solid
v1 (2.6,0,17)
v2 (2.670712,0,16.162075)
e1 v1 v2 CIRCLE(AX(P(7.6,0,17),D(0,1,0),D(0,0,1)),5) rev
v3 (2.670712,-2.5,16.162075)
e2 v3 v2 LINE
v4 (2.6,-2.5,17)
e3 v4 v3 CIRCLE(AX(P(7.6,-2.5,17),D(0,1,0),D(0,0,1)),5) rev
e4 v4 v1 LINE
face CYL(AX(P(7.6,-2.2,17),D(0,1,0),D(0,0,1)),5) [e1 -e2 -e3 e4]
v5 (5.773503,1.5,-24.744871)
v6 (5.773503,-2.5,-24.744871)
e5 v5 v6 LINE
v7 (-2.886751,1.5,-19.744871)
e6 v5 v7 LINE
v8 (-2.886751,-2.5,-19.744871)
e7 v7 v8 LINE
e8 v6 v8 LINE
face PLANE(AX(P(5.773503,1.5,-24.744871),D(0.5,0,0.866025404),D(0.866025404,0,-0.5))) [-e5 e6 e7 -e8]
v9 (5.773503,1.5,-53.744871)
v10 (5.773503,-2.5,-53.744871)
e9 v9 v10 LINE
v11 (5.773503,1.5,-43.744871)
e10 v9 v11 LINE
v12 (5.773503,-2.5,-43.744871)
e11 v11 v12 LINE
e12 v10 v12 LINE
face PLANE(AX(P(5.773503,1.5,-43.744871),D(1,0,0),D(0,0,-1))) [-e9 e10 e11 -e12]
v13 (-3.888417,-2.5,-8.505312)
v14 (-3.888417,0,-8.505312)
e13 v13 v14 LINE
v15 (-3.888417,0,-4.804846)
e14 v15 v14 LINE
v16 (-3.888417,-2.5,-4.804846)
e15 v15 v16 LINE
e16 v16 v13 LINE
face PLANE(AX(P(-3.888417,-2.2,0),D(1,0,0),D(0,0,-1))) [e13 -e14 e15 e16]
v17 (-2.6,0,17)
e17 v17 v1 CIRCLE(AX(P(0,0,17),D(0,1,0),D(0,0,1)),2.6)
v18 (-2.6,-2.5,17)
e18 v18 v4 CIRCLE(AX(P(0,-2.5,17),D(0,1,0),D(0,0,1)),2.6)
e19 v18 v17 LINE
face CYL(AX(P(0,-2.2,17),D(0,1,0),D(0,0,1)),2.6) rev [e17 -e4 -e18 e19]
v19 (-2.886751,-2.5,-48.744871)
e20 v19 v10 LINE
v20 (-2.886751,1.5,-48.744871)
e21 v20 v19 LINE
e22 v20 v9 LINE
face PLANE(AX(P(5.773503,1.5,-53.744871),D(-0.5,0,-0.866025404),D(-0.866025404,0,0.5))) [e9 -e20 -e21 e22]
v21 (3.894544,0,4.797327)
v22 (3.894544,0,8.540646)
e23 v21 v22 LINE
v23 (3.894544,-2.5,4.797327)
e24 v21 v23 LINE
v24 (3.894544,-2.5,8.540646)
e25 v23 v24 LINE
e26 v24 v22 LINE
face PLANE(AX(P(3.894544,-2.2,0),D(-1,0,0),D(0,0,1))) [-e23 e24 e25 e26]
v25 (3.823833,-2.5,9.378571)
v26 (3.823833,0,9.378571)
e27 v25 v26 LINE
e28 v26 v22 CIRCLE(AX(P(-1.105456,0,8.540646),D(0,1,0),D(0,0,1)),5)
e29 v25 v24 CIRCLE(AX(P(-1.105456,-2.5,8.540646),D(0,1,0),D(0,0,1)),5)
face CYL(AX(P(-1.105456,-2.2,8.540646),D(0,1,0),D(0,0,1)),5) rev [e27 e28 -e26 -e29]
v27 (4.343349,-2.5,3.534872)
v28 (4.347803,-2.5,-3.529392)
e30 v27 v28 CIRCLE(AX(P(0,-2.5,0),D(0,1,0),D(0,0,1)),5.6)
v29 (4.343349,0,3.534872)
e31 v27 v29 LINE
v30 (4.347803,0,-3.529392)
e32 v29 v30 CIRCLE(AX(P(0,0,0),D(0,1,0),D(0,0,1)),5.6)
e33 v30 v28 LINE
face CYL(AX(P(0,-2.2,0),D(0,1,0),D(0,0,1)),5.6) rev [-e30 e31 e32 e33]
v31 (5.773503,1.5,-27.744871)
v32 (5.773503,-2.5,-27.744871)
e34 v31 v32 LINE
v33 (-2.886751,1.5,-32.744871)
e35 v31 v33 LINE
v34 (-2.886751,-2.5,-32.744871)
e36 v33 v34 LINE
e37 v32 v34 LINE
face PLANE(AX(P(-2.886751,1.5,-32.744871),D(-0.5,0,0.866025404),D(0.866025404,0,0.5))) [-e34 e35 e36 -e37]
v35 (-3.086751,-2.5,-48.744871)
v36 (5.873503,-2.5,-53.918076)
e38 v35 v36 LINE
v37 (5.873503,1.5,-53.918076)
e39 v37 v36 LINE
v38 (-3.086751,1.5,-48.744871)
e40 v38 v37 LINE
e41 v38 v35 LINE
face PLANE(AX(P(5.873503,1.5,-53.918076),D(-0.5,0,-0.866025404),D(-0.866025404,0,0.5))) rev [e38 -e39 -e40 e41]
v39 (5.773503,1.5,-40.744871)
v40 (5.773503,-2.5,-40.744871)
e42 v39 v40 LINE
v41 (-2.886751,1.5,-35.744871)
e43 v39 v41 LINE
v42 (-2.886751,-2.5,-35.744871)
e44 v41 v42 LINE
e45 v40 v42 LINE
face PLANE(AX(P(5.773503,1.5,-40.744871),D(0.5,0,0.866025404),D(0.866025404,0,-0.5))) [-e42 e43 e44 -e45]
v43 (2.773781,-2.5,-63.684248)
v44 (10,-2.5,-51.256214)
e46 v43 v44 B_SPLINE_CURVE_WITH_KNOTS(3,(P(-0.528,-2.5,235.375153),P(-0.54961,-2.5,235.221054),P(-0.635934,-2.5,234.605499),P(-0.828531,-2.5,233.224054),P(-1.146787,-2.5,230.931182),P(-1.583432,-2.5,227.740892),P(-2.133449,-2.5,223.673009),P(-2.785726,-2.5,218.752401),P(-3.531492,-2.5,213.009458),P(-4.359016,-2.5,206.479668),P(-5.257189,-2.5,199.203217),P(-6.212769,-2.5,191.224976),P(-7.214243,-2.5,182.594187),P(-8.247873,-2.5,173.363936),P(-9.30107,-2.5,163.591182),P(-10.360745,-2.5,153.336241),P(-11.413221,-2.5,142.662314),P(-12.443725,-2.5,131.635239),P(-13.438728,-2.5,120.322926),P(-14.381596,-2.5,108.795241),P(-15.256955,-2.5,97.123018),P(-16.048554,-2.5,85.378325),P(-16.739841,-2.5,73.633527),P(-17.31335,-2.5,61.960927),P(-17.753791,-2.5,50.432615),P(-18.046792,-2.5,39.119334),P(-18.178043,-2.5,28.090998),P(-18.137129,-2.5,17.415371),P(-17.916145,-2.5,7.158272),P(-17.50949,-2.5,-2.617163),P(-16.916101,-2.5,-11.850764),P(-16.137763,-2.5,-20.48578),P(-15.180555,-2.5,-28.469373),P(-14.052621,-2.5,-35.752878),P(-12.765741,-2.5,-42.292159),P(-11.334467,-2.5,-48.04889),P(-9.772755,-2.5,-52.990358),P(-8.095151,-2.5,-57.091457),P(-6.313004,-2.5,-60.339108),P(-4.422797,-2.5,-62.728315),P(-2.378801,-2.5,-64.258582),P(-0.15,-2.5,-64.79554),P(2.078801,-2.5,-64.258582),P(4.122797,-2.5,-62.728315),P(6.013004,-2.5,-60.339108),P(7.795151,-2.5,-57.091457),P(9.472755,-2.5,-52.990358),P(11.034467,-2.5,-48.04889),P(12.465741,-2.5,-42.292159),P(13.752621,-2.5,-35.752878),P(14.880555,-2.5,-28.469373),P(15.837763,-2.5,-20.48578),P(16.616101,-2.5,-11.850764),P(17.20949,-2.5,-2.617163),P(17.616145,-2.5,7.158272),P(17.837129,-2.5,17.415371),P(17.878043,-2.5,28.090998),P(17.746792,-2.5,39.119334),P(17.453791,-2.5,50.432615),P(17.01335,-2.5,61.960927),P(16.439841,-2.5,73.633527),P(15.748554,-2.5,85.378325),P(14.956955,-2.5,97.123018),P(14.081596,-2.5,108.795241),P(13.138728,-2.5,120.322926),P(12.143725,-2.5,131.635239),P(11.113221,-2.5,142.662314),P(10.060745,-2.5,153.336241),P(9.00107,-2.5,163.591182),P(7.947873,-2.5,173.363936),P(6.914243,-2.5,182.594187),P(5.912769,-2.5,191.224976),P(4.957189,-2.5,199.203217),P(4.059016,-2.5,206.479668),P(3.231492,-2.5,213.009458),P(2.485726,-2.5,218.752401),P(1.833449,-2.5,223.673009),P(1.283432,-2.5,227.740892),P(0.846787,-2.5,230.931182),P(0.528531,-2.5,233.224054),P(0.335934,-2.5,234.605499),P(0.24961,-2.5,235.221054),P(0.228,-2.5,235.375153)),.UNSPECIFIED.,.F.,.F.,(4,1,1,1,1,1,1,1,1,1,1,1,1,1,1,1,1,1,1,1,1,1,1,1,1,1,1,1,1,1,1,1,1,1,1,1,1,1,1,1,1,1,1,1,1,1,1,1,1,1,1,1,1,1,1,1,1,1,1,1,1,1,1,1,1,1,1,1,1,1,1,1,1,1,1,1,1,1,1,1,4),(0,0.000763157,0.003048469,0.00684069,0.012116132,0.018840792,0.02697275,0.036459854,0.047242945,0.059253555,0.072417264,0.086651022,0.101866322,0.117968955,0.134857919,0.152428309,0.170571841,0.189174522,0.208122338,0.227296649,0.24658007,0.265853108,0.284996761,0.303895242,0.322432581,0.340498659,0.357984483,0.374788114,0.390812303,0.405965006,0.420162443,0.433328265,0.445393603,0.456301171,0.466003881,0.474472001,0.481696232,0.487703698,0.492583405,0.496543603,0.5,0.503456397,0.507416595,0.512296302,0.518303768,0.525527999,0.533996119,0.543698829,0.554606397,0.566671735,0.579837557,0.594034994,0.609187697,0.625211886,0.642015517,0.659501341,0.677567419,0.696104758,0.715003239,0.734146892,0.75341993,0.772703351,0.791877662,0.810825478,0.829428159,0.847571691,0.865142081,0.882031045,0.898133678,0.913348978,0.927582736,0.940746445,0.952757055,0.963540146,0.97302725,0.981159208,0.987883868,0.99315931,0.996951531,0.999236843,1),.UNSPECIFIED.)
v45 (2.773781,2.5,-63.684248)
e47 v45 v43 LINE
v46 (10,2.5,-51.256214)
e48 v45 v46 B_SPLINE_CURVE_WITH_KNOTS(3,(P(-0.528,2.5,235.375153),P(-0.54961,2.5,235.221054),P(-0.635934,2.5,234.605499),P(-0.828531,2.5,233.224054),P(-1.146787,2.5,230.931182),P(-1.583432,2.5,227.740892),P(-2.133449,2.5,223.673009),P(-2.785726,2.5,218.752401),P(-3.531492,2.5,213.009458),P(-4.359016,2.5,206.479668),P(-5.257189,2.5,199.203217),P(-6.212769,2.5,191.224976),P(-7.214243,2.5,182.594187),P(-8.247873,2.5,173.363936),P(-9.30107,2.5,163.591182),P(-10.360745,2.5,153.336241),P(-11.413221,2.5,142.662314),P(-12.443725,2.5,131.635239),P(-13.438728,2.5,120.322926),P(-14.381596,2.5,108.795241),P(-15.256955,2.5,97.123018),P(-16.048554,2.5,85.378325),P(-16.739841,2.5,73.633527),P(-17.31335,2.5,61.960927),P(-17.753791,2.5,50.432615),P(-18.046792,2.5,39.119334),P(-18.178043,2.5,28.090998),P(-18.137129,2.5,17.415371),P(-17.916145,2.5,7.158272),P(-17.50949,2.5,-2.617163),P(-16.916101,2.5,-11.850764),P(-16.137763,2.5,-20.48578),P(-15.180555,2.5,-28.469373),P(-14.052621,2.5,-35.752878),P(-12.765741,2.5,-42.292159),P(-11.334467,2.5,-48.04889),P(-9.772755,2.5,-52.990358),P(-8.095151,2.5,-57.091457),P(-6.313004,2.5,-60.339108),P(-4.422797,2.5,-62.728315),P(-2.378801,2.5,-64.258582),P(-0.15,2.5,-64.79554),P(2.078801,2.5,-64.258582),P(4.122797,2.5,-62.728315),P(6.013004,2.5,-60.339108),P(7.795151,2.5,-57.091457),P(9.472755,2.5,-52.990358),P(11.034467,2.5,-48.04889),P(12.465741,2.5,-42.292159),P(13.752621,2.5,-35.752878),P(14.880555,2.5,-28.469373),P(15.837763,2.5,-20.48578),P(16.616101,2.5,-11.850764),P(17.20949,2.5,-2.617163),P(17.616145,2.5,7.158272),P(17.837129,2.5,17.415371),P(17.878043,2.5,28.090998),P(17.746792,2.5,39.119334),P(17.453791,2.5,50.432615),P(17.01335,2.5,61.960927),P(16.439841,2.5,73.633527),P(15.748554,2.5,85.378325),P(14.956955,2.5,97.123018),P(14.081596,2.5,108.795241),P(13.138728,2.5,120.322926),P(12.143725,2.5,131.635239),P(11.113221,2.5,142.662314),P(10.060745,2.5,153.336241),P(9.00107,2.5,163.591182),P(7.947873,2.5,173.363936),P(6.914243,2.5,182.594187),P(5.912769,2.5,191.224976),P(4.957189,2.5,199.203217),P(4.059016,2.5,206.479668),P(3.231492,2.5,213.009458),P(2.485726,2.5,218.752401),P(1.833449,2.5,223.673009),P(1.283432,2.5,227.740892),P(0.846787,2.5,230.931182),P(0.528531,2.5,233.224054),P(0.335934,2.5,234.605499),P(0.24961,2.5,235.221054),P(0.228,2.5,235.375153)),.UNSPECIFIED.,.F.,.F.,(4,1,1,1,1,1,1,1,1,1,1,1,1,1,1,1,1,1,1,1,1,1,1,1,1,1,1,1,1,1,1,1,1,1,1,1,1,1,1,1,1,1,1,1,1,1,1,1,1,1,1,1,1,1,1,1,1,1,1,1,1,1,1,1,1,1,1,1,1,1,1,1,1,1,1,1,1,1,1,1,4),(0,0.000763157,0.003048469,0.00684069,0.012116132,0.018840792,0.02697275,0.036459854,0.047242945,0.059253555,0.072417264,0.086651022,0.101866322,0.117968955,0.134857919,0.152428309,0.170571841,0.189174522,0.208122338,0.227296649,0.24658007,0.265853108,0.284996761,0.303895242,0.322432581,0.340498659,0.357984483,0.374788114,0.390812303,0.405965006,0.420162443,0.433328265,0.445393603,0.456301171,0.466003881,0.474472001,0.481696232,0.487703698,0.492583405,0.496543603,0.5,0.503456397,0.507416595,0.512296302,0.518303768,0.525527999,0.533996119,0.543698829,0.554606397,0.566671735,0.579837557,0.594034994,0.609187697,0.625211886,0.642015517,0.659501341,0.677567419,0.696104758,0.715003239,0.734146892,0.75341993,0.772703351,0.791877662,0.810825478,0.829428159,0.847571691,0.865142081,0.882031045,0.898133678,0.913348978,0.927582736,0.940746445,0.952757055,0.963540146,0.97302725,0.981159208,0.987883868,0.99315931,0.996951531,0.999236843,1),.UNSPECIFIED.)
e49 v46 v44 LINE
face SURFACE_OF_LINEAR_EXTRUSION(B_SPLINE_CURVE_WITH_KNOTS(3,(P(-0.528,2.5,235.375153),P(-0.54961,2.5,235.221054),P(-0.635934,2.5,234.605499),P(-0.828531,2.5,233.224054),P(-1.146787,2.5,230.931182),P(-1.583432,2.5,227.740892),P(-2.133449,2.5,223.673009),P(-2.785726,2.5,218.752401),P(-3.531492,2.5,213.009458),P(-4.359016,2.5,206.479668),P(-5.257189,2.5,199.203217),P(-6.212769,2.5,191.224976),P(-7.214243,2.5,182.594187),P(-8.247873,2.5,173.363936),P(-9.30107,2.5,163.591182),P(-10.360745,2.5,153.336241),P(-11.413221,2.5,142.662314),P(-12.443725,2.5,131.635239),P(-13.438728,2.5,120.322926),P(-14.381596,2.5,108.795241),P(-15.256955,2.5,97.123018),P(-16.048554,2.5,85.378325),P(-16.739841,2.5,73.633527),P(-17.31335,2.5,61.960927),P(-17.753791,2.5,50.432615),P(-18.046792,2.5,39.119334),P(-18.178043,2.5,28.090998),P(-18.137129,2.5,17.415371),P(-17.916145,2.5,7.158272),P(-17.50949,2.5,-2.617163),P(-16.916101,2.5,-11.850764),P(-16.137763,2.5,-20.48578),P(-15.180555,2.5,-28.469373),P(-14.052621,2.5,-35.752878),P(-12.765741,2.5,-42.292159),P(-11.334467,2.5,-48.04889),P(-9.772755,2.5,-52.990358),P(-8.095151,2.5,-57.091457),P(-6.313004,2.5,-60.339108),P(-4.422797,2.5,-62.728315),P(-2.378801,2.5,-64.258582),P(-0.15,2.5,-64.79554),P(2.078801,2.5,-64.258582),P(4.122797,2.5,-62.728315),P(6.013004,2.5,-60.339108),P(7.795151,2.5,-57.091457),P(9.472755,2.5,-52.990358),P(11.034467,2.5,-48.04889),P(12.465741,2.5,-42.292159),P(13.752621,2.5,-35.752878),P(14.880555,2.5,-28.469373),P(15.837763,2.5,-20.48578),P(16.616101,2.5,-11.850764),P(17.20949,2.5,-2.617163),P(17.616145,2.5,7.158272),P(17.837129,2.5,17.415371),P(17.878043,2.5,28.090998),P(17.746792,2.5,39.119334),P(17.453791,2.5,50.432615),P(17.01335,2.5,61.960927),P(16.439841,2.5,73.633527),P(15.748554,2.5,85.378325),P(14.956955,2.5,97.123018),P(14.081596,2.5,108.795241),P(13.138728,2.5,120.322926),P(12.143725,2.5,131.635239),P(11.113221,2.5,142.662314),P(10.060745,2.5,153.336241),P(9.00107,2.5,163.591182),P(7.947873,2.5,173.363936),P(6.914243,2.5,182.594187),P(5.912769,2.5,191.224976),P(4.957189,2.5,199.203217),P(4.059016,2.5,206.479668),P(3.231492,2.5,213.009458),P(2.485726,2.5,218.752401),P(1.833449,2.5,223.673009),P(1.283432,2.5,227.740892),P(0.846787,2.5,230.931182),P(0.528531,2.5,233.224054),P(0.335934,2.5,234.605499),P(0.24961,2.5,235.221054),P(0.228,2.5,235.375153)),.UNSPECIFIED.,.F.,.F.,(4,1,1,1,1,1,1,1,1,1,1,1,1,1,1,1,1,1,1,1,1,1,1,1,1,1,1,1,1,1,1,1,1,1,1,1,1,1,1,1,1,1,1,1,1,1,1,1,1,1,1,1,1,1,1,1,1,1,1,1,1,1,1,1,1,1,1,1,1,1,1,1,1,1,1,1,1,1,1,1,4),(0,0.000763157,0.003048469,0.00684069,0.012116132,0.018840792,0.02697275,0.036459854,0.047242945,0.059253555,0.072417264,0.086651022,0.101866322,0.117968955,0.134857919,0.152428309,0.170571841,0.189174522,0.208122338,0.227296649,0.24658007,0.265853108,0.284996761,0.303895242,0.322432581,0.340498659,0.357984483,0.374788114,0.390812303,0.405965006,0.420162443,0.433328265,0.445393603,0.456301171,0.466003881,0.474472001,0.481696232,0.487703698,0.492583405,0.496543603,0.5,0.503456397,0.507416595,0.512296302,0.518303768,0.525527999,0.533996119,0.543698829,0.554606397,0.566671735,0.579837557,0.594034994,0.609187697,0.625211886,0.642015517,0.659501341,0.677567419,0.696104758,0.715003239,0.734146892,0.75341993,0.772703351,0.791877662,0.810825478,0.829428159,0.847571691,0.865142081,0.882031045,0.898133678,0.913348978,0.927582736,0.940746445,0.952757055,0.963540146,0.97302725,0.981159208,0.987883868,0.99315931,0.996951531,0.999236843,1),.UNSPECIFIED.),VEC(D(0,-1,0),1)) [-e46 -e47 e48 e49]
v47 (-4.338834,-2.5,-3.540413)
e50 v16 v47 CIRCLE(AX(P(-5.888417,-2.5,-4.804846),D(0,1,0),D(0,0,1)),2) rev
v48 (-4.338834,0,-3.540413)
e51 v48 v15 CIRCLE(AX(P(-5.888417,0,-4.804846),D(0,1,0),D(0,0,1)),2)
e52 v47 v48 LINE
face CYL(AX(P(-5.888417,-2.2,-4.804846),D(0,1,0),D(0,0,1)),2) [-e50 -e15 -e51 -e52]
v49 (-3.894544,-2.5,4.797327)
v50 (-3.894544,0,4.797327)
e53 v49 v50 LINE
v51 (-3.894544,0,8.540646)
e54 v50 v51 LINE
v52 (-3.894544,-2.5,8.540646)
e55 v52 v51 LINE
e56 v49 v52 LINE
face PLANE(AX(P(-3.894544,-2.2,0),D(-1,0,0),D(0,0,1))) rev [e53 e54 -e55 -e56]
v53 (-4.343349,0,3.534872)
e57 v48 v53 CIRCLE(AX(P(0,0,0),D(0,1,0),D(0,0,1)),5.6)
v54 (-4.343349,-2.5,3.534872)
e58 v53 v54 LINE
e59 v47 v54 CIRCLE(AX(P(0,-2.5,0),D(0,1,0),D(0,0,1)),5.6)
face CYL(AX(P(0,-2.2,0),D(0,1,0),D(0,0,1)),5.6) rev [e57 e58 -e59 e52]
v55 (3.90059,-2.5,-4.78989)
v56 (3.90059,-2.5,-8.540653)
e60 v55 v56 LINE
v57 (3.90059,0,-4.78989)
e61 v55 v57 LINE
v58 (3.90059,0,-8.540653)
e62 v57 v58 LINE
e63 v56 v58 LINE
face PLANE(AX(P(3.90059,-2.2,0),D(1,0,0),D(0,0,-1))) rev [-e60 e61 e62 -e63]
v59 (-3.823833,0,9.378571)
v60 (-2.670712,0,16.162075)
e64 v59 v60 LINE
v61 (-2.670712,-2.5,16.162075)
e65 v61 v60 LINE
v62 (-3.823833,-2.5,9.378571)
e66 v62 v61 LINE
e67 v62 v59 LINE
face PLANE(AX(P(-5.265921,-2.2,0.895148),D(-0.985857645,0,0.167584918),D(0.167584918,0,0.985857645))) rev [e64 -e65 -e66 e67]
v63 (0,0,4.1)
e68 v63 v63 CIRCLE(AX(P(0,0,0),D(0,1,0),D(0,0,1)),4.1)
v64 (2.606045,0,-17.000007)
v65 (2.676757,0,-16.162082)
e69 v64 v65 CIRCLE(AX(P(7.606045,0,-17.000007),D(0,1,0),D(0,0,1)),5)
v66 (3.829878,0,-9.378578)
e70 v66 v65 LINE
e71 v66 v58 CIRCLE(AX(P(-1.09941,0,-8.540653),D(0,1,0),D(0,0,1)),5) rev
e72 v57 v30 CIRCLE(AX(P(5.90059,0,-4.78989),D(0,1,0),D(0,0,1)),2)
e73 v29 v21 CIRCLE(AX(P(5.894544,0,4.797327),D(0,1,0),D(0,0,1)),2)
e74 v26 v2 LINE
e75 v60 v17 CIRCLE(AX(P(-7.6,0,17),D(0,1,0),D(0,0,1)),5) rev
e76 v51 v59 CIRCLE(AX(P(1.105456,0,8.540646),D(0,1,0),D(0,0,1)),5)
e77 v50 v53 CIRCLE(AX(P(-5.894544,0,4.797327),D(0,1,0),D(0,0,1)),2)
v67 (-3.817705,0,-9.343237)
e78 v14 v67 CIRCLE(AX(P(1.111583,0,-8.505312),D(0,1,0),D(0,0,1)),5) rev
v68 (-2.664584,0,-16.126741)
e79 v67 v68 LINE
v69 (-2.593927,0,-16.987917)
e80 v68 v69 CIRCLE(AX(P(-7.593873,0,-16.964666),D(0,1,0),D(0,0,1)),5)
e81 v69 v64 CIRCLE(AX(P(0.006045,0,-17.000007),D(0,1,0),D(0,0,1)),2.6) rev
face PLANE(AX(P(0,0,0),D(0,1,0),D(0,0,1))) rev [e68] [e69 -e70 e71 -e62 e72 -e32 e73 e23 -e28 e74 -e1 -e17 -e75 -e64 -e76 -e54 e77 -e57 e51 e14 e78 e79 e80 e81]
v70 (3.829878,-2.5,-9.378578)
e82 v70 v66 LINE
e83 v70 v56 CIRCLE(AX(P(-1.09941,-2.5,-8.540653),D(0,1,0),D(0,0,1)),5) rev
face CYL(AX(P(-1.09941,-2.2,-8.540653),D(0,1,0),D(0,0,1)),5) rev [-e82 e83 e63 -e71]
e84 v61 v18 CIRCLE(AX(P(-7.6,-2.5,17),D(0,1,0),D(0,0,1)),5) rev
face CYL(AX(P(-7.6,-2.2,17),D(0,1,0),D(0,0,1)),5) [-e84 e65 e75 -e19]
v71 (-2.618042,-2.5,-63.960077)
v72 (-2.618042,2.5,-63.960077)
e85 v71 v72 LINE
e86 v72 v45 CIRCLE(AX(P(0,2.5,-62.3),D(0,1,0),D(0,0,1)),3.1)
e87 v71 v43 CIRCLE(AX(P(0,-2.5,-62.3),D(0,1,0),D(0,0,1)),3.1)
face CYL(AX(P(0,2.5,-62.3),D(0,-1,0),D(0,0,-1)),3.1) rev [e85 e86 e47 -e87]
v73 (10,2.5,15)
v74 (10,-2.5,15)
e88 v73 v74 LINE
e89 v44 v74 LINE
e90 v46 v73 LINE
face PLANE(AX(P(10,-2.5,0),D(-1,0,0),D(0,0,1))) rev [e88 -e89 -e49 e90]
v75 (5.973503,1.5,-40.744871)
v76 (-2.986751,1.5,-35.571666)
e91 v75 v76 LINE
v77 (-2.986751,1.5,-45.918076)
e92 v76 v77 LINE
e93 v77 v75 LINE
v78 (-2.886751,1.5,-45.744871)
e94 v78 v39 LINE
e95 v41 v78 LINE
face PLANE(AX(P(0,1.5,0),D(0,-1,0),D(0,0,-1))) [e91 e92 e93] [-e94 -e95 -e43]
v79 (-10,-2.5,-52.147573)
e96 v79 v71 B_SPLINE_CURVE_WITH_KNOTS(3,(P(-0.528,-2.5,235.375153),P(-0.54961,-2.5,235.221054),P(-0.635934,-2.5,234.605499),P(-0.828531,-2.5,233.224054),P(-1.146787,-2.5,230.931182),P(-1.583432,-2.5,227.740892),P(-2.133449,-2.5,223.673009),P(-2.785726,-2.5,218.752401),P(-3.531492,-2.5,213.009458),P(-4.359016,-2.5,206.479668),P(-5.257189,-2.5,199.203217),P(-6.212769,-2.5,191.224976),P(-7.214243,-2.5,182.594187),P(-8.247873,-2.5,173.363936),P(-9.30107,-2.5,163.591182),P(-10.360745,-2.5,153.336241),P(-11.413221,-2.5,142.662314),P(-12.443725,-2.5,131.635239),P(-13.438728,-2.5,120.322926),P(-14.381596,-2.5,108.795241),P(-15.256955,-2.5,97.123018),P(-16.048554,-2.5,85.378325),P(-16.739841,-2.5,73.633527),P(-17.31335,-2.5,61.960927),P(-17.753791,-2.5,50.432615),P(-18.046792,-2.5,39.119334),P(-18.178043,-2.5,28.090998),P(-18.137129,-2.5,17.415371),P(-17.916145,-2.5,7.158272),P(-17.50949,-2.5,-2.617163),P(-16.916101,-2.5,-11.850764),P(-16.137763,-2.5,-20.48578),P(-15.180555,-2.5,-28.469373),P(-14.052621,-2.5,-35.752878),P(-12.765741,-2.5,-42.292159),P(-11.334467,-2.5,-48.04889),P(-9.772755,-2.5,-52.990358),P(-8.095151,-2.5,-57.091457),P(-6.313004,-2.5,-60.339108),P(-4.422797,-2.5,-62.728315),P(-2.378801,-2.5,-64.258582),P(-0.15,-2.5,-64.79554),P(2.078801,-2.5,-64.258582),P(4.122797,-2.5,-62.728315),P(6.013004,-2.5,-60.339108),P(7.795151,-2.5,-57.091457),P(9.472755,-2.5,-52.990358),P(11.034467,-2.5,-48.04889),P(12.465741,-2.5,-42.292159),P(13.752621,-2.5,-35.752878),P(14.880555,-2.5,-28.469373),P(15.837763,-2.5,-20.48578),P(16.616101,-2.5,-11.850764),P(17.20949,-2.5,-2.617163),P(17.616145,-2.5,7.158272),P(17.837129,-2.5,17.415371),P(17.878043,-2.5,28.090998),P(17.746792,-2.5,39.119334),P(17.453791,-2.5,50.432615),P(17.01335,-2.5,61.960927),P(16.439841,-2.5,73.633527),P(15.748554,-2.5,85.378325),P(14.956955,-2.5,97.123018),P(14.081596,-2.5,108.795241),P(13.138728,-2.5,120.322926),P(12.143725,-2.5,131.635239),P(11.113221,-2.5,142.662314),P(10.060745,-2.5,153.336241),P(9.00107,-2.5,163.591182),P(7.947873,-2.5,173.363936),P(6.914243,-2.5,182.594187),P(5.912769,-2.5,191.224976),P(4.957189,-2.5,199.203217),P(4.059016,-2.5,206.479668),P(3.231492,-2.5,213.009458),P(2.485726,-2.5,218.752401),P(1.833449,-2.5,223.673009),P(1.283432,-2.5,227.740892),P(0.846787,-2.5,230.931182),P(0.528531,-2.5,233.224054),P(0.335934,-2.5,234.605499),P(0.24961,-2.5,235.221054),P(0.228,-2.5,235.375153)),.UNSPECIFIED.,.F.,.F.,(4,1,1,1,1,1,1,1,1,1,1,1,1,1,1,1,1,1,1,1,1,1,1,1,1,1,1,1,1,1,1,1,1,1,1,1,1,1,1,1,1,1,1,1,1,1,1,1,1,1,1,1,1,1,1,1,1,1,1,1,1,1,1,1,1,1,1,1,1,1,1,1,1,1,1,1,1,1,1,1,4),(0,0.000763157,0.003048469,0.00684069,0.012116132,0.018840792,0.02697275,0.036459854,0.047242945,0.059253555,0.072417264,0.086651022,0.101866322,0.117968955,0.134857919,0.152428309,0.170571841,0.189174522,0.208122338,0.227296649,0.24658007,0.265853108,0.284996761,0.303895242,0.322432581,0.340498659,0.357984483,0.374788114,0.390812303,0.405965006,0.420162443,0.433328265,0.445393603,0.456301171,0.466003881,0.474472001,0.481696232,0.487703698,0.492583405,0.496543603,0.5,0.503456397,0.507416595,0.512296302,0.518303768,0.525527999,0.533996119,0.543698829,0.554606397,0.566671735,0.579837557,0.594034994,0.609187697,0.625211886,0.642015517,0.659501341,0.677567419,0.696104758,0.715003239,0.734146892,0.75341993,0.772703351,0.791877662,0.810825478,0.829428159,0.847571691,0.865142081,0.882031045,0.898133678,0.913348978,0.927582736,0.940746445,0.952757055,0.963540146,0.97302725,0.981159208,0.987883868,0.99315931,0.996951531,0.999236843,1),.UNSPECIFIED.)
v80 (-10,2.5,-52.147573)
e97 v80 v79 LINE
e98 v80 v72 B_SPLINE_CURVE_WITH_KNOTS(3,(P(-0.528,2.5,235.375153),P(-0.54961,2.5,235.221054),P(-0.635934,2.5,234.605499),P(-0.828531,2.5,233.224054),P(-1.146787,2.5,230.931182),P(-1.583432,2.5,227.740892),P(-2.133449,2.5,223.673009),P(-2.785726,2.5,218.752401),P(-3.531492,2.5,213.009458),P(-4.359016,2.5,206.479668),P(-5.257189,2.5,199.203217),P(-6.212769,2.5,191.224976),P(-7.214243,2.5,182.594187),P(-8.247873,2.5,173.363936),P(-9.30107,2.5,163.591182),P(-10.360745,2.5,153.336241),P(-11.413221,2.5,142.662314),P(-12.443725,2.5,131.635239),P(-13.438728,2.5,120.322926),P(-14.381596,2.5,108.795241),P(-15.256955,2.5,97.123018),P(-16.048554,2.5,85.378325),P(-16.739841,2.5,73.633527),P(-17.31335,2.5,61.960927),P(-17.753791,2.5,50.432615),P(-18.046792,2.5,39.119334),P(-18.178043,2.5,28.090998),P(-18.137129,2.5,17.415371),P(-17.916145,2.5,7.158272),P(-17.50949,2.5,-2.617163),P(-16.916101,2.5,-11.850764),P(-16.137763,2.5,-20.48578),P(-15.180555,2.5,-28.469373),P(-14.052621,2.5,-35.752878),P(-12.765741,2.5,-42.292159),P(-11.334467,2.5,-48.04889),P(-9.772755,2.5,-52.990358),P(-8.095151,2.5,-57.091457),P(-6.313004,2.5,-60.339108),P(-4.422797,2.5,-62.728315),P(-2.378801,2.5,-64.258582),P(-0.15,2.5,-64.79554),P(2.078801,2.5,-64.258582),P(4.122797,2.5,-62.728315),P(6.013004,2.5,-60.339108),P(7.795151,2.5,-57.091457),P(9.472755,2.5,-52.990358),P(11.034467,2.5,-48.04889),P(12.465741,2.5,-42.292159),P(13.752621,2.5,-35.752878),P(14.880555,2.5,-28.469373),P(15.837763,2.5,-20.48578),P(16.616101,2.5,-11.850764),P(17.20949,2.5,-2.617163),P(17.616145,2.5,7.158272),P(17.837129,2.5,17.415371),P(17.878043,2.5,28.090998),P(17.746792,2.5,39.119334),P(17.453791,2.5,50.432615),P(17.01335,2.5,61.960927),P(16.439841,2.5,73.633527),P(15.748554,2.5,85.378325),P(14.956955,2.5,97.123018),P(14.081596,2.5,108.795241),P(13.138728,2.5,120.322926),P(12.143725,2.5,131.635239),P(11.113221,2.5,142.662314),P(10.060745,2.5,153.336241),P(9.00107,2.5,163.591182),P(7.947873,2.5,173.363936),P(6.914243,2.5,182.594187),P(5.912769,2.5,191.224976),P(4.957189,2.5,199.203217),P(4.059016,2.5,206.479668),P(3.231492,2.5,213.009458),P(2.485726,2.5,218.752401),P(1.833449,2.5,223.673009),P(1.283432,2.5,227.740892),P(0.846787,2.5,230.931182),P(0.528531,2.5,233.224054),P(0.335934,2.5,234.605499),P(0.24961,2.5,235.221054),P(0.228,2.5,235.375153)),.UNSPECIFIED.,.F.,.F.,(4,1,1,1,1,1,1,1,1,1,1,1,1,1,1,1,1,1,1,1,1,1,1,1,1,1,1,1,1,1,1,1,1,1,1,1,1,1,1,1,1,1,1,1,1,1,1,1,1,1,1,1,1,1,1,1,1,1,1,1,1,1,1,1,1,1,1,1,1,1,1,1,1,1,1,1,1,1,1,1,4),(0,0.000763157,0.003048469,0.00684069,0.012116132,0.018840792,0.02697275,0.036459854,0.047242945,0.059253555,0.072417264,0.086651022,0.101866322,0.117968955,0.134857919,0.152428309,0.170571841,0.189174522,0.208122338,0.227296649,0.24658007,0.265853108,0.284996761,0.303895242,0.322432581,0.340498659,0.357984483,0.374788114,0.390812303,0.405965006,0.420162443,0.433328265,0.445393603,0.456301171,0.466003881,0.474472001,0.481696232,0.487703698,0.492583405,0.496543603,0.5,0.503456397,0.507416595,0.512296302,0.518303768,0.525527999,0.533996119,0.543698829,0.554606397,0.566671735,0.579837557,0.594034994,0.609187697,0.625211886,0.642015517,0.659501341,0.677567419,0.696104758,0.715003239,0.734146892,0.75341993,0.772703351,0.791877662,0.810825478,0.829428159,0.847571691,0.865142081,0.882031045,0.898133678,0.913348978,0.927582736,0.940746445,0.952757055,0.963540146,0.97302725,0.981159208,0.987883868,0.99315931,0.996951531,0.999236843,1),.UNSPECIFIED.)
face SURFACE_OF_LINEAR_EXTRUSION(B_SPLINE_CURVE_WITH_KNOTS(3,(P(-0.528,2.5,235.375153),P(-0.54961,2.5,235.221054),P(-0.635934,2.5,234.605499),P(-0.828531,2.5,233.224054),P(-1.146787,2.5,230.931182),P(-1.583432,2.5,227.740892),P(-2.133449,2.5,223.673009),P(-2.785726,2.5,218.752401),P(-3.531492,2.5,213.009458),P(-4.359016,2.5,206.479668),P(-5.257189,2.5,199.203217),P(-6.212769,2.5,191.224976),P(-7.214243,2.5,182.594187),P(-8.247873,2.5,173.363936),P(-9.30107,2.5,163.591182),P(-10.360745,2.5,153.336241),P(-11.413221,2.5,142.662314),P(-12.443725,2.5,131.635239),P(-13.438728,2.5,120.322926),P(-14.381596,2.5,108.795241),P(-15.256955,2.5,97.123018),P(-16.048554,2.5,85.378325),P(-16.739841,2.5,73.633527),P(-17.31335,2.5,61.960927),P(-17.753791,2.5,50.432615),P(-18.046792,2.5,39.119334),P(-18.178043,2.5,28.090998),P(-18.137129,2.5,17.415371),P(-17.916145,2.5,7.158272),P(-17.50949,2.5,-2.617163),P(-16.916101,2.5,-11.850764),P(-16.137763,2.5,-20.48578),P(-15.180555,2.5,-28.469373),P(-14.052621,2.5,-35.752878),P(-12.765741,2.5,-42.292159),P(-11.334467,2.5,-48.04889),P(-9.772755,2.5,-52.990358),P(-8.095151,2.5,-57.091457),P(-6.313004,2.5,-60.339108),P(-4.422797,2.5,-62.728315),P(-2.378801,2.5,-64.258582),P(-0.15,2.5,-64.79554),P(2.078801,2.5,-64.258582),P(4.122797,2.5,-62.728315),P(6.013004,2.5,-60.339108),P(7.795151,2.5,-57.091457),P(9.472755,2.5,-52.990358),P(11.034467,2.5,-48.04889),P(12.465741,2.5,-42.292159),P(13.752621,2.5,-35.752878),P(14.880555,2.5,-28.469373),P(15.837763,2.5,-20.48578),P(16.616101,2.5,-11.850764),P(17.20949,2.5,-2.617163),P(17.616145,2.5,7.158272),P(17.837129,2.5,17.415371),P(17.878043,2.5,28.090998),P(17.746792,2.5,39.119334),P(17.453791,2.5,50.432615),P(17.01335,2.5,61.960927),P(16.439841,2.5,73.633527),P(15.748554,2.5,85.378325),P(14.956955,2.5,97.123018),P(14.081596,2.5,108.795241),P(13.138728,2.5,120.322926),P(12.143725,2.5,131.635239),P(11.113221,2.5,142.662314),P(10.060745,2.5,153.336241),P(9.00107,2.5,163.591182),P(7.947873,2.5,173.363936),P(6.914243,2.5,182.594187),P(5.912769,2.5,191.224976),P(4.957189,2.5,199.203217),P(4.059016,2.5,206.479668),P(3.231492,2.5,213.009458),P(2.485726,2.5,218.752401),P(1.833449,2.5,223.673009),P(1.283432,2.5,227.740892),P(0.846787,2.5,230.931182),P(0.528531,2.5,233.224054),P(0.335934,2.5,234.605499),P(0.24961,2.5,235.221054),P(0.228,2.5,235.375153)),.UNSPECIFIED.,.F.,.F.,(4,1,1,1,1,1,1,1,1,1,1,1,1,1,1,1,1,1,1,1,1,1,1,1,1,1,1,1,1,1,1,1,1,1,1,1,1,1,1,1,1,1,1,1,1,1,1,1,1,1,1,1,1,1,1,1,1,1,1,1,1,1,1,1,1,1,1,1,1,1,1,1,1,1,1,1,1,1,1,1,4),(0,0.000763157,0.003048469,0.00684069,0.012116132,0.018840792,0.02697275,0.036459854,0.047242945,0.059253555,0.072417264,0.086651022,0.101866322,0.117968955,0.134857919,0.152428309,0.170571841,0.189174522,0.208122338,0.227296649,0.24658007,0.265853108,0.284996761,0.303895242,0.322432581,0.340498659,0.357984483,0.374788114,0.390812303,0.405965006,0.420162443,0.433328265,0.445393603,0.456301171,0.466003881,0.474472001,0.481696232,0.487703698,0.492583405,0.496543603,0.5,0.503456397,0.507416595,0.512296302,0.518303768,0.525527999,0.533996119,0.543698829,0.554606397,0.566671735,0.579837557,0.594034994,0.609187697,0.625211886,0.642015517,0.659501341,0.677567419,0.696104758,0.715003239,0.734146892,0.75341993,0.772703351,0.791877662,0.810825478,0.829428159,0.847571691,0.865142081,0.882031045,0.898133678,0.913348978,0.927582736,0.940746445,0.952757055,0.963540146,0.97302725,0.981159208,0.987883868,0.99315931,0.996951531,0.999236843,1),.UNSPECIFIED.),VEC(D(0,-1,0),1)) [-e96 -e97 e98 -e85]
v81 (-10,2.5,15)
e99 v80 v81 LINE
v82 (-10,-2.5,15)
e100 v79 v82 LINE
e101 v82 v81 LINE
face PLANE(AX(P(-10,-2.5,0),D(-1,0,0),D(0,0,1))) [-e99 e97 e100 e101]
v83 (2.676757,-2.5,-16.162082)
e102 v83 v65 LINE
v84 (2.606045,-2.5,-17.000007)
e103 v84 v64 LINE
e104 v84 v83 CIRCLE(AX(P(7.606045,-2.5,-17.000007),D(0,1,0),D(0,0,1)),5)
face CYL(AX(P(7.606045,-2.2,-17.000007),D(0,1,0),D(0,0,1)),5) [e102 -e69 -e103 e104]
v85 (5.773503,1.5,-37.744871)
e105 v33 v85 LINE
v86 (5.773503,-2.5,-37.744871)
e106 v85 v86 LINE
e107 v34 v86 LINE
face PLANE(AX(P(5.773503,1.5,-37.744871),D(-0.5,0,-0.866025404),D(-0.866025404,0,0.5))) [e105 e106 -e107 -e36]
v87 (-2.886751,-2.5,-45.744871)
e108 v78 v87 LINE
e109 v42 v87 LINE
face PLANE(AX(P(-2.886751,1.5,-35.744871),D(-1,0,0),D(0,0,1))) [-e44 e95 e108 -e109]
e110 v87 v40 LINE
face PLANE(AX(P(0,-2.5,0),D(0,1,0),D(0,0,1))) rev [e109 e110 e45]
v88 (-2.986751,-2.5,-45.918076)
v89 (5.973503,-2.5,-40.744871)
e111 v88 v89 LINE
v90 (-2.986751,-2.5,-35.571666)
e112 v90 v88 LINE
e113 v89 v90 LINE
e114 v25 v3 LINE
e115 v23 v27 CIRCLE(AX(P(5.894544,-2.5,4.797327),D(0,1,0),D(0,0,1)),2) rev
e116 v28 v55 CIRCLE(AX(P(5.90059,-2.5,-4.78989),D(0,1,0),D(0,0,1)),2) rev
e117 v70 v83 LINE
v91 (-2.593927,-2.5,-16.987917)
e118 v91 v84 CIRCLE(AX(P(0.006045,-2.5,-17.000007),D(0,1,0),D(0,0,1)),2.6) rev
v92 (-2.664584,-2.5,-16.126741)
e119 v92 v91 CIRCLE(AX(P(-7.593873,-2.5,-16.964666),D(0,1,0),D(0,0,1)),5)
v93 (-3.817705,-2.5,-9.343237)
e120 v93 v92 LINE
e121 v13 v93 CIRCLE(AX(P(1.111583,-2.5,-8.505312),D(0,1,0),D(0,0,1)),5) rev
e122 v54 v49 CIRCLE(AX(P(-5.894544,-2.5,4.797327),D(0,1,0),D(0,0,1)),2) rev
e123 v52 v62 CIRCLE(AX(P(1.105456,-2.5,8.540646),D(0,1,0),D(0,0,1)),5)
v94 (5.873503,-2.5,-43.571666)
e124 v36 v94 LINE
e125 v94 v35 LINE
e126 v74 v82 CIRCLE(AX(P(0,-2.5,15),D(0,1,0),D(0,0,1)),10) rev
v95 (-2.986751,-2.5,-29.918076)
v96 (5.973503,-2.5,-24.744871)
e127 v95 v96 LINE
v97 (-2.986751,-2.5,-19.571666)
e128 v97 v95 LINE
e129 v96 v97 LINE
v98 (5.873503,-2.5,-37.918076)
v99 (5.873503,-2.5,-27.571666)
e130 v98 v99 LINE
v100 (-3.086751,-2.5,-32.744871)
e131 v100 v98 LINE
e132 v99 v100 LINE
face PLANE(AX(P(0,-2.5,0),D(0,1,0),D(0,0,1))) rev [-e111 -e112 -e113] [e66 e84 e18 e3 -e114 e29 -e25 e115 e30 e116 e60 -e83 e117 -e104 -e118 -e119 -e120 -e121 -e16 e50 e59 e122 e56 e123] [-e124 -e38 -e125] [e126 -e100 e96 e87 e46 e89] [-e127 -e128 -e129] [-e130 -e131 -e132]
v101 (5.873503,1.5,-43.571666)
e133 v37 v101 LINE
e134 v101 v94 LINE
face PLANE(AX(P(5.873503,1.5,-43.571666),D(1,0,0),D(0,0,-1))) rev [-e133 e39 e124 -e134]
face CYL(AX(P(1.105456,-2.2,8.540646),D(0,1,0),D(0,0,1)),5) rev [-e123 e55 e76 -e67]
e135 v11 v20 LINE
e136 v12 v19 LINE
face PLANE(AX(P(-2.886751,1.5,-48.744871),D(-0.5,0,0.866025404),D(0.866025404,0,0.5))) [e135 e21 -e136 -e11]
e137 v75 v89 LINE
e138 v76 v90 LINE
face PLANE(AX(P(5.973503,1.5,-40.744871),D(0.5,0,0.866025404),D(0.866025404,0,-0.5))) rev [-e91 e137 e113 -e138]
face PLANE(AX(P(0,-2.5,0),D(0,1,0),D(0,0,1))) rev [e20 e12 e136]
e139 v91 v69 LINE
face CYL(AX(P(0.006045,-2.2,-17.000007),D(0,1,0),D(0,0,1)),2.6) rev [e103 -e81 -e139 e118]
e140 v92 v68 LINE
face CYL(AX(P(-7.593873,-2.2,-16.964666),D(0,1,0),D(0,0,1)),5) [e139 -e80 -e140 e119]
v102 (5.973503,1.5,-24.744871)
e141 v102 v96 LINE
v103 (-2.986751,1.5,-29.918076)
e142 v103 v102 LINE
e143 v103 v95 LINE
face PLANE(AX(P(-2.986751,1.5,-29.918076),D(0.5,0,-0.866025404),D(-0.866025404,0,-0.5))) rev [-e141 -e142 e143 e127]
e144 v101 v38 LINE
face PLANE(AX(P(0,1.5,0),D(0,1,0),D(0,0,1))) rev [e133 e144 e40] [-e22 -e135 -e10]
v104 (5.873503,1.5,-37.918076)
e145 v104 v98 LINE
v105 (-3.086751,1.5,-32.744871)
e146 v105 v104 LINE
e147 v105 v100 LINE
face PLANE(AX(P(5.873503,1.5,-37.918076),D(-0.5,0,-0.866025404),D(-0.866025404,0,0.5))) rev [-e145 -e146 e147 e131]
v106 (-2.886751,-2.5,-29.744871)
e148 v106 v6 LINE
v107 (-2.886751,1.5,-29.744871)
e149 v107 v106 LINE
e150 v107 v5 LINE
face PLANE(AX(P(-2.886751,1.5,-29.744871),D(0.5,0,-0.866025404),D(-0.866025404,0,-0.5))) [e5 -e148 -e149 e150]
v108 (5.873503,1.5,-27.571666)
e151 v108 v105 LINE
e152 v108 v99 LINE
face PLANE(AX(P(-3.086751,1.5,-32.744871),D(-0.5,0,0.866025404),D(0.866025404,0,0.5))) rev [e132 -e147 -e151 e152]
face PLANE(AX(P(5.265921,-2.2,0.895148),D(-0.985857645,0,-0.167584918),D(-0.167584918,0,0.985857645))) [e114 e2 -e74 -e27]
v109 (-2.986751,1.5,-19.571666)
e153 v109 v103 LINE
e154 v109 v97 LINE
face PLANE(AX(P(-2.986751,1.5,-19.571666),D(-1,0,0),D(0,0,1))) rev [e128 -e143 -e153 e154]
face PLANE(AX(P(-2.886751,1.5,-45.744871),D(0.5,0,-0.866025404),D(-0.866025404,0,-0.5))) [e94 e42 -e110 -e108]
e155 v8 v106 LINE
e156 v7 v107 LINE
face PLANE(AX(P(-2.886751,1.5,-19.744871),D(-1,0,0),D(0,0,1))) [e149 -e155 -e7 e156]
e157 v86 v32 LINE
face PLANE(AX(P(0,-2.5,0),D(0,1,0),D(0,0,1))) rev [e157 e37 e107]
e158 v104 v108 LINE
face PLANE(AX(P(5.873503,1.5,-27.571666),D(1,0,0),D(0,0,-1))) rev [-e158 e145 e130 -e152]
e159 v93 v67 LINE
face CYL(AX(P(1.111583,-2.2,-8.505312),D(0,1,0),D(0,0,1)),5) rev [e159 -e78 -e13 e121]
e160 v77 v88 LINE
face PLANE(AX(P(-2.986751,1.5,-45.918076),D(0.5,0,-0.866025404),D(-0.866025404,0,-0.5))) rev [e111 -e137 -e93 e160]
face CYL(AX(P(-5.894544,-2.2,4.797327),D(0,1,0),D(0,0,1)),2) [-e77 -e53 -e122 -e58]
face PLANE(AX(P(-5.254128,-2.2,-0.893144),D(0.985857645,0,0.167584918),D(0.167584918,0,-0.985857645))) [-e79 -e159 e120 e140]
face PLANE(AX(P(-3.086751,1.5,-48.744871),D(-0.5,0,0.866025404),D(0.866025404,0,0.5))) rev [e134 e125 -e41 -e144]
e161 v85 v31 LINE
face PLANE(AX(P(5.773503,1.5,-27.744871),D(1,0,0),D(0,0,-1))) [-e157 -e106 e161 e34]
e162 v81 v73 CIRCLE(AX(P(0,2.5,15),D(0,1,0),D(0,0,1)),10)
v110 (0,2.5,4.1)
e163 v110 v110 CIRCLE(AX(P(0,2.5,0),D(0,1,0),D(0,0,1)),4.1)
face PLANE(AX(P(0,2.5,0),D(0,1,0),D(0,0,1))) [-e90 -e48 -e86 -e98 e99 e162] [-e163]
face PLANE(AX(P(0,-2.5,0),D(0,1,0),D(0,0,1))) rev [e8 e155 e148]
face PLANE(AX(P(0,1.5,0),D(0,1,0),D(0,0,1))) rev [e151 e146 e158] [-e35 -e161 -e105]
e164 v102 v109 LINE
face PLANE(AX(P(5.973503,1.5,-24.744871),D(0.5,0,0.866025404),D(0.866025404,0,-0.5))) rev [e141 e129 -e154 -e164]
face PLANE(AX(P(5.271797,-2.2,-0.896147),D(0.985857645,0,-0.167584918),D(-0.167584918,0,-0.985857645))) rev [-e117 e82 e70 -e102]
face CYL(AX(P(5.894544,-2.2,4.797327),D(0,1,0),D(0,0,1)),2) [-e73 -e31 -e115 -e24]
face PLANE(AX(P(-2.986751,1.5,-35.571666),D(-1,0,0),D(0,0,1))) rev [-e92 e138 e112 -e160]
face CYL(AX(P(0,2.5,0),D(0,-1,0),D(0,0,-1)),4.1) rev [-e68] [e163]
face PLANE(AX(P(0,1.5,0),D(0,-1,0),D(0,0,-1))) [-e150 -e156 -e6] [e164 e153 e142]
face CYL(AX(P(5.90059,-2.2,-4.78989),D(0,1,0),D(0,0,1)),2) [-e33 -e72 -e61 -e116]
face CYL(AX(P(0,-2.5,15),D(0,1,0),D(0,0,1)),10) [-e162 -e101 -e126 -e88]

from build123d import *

# Parameters (mm, degrees)
SKETCH1_W           = 15
SKETCH1_H           = 45
BOSS_EXTRUDE1_DEPTH = 2.2
SKETCH1_3_W         = 20
SKETCH1_3_H         = 50
SKETCH1_3_W_2       = 15
SKETCH1_3_H_2       = 45
BOSS_EXTRUDE2_DEPTH = 2.5
SKETCH1_4_W         = 20
SKETCH1_4_H         = 50
SKETCH1_4_R         = 4.1
BOSS_EXTRUDE3_DEPTH = 2.5
FILLET1_R           = 2
SKETCH1_5_R         = 3.1
BOSS_EXTRUDE4_DEPTH = 2.5
FILLET2_R           = 10
CUT_EXTRUDE2_DEPTH  = 4
SKETCH3_OUTSIDE_W   = 41.892
SKETCH3_OUTSIDE_H   = 119.192
CUT_EXTRUDE3_DEPTH  = 74.159346635


with BuildPart() as part:
    # Sketch1 → Boss-Extrude1 (new body)
    with BuildSketch(Plane(origin=(0, 0, 0), x_dir=(1, 0, 0), z_dir=(0, 1, 0))):
        Rectangle(SKETCH1_W, SKETCH1_H)
        with BuildLine():
            ThreePointArc((-3.894544437, -4.023993492), (-5.599998379, 0.004260474), (-3.88841703, 4.029914763))
            Line((-3.88841703, 4.029914763), (-3.88841703, 8.505312122))
            ThreePointArc((-3.88841703, 8.505312122), (-3.870707724, 8.925763598), (-3.817705253, 9.343236712))
            Line((-3.817705253, 9.343236712), (-2.664584371, 16.126741161))
            ThreePointArc((-2.664584371, 16.126741161), (-2.610617779, 16.555799687), (-2.593926654, 16.987916591))
            ThreePointArc((-2.593926654, 16.987916591), (0, 19.6), (2.606045235, 17.000007028))
            ThreePointArc((2.606045235, 17.000007028), (2.623754541, 16.579555552), (2.676757012, 16.162082438))
            Line((2.676757012, 16.162082438), (3.829877895, 9.378577989))
            ThreePointArc((3.829877895, 9.378577989), (3.882880366, 8.961104875), (3.900589672, 8.540653399))
            Line((3.900589672, 8.540653399), (3.900589672, 4.018133922))
            ThreePointArc((3.900589672, 4.018133922), (5.157678846, 2.181364004), (5.6, 0))
            ThreePointArc((5.6, 0), (5.156037667, -2.185240393), (3.894544437, -4.023993492))
            Line((3.894544437, -4.023993492), (3.894544437, -8.540646372))
            ThreePointArc((3.894544437, -8.540646372), (3.876835131, -8.961097847), (3.82383266, -9.378570962))
            Line((3.82383266, -9.378570962), (2.670711777, -16.16207541))
            ThreePointArc((2.670711777, -16.16207541), (2.617709306, -16.579548524), (2.6, -17))
            ThreePointArc((2.6, -17), (0, -19.6), (-2.6, -17))
            ThreePointArc((-2.6, -17), (-2.617709306, -16.579548524), (-2.670711777, -16.16207541))
            Line((-2.670711777, -16.16207541), (-3.82383266, -9.378570962))
            ThreePointArc((-3.82383266, -9.378570962), (-3.876835131, -8.961097847), (-3.894544437, -8.540646372))
            Line((-3.894544437, -8.540646372), (-3.894544437, -4.023993492))
        make_face(mode=Mode.SUBTRACT)
    extrude(amount=-BOSS_EXTRUDE1_DEPTH)

    # Sketch1<3> → Boss-Extrude2 (add)
    # profile 1 of 2: a face of its own
    with BuildSketch(Plane(origin=(0, 0, 0), x_dir=(1, 0, 0), z_dir=(0, 1, 0))):
        Rectangle(SKETCH1_3_W, SKETCH1_3_H)
        Rectangle(SKETCH1_3_W_2, SKETCH1_3_H_2, mode=Mode.SUBTRACT)
    # profile 2 of 2: a face of its own
    with BuildSketch(Plane(origin=(0, 0, 0), x_dir=(1, 0, 0), z_dir=(0, 1, 0))):
        Rectangle(SKETCH1_3_W_2, SKETCH1_3_H_2)
        with BuildLine():
            ThreePointArc((-3.894544437, -4.023993492), (-5.599998379, 0.004260474), (-3.88841703, 4.029914763))
            Line((-3.88841703, 4.029914763), (-3.88841703, 8.505312122))
            ThreePointArc((-3.88841703, 8.505312122), (-3.870707724, 8.925763598), (-3.817705253, 9.343236712))
            Line((-3.817705253, 9.343236712), (-2.664584371, 16.126741161))
            ThreePointArc((-2.664584371, 16.126741161), (-2.610617779, 16.555799687), (-2.593926654, 16.987916591))
            ThreePointArc((-2.593926654, 16.987916591), (0, 19.6), (2.606045235, 17.000007028))
            ThreePointArc((2.606045235, 17.000007028), (2.623754541, 16.579555552), (2.676757012, 16.162082438))
            Line((2.676757012, 16.162082438), (3.829877895, 9.378577989))
            ThreePointArc((3.829877895, 9.378577989), (3.882880366, 8.961104875), (3.900589672, 8.540653399))
            Line((3.900589672, 8.540653399), (3.900589672, 4.018133922))
            ThreePointArc((3.900589672, 4.018133922), (5.157678846, 2.181364004), (5.6, 0))
            ThreePointArc((5.6, 0), (5.156037667, -2.185240393), (3.894544437, -4.023993492))
            Line((3.894544437, -4.023993492), (3.894544437, -8.540646372))
            ThreePointArc((3.894544437, -8.540646372), (3.876835131, -8.961097847), (3.82383266, -9.378570962))
            Line((3.82383266, -9.378570962), (2.670711777, -16.16207541))
            ThreePointArc((2.670711777, -16.16207541), (2.617709306, -16.579548524), (2.6, -17))
            ThreePointArc((2.6, -17), (0, -19.6), (-2.6, -17))
            ThreePointArc((-2.6, -17), (-2.617709306, -16.579548524), (-2.670711777, -16.16207541))
            Line((-2.670711777, -16.16207541), (-3.82383266, -9.378570962))
            ThreePointArc((-3.82383266, -9.378570962), (-3.876835131, -8.961097847), (-3.894544437, -8.540646372))
            Line((-3.894544437, -8.540646372), (-3.894544437, -4.023993492))
        make_face(mode=Mode.SUBTRACT)
    extrude(amount=-BOSS_EXTRUDE2_DEPTH)

    # Sketch1<4> → Boss-Extrude3 (add)
    with BuildSketch(Plane(origin=(0, 0, 0), x_dir=(1, 0, 0), z_dir=(0, 1, 0))):
        Rectangle(SKETCH1_4_W, SKETCH1_4_H)
        with Locations(Location((0, 0, 0), (0, 0, 270))):
            Circle(SKETCH1_4_R, mode=Mode.SUBTRACT)
    extrude(amount=BOSS_EXTRUDE3_DEPTH)

    # Fillet1
    fillet1_edges = [part.edges().sort_by_distance(p)[0] for p in [
        (-3.88841703, -1.25, -4.029914763),
        (-3.894544437, -1.25, 4.023993492),
        (3.894544437, -1.25, 4.023993492),
        (3.900589672, -1.25, -4.018133922),
    ]]
    fillet(fillet1_edges, radius=FILLET1_R)

    # Sketch1<5> → Boss-Extrude4 (add, symmetric)
    with BuildSketch(Plane(origin=(0, 0, 0), x_dir=(1, 0, 0), z_dir=(0, 1, 0))):
        with BuildLine():
            ThreePointArc((-10, 62.3), (0, 72.3), (10, 62.3))
            Line((10, 62.3), (10, 25))
            Line((10, 25), (-10, 25))
            Line((-10, 25), (-10, 62.3))
        make_face()
        with Locations(Location((0, 62.3, 0), (0, 0, 270))):
            Circle(SKETCH1_5_R, mode=Mode.SUBTRACT)
    extrude(amount=BOSS_EXTRUDE4_DEPTH, both=True)

    # Fillet2
    fillet2_edges = [part.edges().sort_by_distance(p)[0] for p in [
        (10, 0, 25),
        (-10, 0, 25),
    ]]
    fillet(fillet2_edges, radius=FILLET2_R - 0.0001)  # a hair under: the kernel refuses the full size

    # Sketch2 → Cut-Extrude2 (cut)
    # profile 1 of 4: a face of its own
    with BuildSketch(Plane.XZ.offset(2.5)):
        Polygon((5.973502692, -40.744870683), (-2.986751346, -35.571665602), (-2.986751346, -45.918075763), align=None)
        Polygon((5.773502692, -40.744870683), (-2.886751346, -35.744870683), (-2.886751346, -45.744870683), align=None, mode=Mode.SUBTRACT)
    # profile 2 of 4: a face of its own
    with BuildSketch(Plane.XZ.offset(2.5)):
        Polygon((5.973502692, -24.744870683), (-2.986751346, -19.571665602), (-2.986751346, -29.918075763), align=None)
        Polygon((5.773502692, -24.744870683), (-2.886751346, -19.744870683), (-2.886751346, -29.744870683), align=None, mode=Mode.SUBTRACT)
    # profile 3 of 4: a face of its own
    with BuildSketch(Plane.XZ.offset(2.5)):
        Polygon((-3.086751346, -48.744870683), (5.873502692, -43.571665602), (5.873502692, -53.918075763), align=None)
        Polygon((5.773502692, -53.744870683), (-2.886751346, -48.744870683), (5.773502692, -43.744870683), align=None, mode=Mode.SUBTRACT)
    # profile 4 of 4: a face of its own
    with BuildSketch(Plane.XZ.offset(2.5)):
        Polygon((-3.086751346, -32.744870683), (5.873502692, -27.571665602), (5.873502692, -37.918075763), align=None)
        Polygon((5.773502692, -37.744870683), (-2.886751346, -32.744870683), (5.773502692, -27.744870683), align=None, mode=Mode.SUBTRACT)
    extrude(amount=-CUT_EXTRUDE2_DEPTH, mode=Mode.SUBTRACT)

    # Sketch3 outside → Cut-Extrude3 (cut, through all)
    with BuildSketch(Plane.XZ.offset(2.5)):
        with Locations((0, -23.65)):
            Rectangle(SKETCH3_OUTSIDE_W, SKETCH3_OUTSIDE_H)
        with BuildLine():
            Line((10, -51.256214284), (10, 15))
            ThreePointArc((10, 15), (7.071067812, 22.071067812), (0, 25))
            ThreePointArc((0, 25), (-7.071067812, 22.071067812), (-10, 15))
            Line((-10, 15), (-10, -52.147572729))
            add(Edge.make_bspline(
                [(10, -51.256214284), (9.785135746, -51.909968828), (9.078957117, -53.953043182), (7.795150781, -57.091457155), (6.013003778, -60.33910848), (4.122796637, -62.728314915), (2.078800951, -64.258582197), (-0.15, -64.79554013), (-2.378800951, -64.258582197), (-4.422796637, -62.728314915), (-6.313003778, -60.33910848), (-8.095150781, -57.091457155), (-9.260115035, -54.243566479), (-9.877905488, -52.501784004), (-10, -52.147572729)],
                knots=[0.471097659, 0.471097659, 0.471097659, 0.471097659, 0.474472001, 0.481696232, 0.487703698, 0.492583405, 0.496543603, 0.5, 0.503456397, 0.507416595, 0.512296302, 0.518303768, 0.525527999, 0.527365119, 0.527365119, 0.527365119, 0.527365119], degree=3))
        make_face(mode=Mode.SUBTRACT)
    extrude(amount=-CUT_EXTRUDE3_DEPTH, mode=Mode.SUBTRACT)


solid = part.part
